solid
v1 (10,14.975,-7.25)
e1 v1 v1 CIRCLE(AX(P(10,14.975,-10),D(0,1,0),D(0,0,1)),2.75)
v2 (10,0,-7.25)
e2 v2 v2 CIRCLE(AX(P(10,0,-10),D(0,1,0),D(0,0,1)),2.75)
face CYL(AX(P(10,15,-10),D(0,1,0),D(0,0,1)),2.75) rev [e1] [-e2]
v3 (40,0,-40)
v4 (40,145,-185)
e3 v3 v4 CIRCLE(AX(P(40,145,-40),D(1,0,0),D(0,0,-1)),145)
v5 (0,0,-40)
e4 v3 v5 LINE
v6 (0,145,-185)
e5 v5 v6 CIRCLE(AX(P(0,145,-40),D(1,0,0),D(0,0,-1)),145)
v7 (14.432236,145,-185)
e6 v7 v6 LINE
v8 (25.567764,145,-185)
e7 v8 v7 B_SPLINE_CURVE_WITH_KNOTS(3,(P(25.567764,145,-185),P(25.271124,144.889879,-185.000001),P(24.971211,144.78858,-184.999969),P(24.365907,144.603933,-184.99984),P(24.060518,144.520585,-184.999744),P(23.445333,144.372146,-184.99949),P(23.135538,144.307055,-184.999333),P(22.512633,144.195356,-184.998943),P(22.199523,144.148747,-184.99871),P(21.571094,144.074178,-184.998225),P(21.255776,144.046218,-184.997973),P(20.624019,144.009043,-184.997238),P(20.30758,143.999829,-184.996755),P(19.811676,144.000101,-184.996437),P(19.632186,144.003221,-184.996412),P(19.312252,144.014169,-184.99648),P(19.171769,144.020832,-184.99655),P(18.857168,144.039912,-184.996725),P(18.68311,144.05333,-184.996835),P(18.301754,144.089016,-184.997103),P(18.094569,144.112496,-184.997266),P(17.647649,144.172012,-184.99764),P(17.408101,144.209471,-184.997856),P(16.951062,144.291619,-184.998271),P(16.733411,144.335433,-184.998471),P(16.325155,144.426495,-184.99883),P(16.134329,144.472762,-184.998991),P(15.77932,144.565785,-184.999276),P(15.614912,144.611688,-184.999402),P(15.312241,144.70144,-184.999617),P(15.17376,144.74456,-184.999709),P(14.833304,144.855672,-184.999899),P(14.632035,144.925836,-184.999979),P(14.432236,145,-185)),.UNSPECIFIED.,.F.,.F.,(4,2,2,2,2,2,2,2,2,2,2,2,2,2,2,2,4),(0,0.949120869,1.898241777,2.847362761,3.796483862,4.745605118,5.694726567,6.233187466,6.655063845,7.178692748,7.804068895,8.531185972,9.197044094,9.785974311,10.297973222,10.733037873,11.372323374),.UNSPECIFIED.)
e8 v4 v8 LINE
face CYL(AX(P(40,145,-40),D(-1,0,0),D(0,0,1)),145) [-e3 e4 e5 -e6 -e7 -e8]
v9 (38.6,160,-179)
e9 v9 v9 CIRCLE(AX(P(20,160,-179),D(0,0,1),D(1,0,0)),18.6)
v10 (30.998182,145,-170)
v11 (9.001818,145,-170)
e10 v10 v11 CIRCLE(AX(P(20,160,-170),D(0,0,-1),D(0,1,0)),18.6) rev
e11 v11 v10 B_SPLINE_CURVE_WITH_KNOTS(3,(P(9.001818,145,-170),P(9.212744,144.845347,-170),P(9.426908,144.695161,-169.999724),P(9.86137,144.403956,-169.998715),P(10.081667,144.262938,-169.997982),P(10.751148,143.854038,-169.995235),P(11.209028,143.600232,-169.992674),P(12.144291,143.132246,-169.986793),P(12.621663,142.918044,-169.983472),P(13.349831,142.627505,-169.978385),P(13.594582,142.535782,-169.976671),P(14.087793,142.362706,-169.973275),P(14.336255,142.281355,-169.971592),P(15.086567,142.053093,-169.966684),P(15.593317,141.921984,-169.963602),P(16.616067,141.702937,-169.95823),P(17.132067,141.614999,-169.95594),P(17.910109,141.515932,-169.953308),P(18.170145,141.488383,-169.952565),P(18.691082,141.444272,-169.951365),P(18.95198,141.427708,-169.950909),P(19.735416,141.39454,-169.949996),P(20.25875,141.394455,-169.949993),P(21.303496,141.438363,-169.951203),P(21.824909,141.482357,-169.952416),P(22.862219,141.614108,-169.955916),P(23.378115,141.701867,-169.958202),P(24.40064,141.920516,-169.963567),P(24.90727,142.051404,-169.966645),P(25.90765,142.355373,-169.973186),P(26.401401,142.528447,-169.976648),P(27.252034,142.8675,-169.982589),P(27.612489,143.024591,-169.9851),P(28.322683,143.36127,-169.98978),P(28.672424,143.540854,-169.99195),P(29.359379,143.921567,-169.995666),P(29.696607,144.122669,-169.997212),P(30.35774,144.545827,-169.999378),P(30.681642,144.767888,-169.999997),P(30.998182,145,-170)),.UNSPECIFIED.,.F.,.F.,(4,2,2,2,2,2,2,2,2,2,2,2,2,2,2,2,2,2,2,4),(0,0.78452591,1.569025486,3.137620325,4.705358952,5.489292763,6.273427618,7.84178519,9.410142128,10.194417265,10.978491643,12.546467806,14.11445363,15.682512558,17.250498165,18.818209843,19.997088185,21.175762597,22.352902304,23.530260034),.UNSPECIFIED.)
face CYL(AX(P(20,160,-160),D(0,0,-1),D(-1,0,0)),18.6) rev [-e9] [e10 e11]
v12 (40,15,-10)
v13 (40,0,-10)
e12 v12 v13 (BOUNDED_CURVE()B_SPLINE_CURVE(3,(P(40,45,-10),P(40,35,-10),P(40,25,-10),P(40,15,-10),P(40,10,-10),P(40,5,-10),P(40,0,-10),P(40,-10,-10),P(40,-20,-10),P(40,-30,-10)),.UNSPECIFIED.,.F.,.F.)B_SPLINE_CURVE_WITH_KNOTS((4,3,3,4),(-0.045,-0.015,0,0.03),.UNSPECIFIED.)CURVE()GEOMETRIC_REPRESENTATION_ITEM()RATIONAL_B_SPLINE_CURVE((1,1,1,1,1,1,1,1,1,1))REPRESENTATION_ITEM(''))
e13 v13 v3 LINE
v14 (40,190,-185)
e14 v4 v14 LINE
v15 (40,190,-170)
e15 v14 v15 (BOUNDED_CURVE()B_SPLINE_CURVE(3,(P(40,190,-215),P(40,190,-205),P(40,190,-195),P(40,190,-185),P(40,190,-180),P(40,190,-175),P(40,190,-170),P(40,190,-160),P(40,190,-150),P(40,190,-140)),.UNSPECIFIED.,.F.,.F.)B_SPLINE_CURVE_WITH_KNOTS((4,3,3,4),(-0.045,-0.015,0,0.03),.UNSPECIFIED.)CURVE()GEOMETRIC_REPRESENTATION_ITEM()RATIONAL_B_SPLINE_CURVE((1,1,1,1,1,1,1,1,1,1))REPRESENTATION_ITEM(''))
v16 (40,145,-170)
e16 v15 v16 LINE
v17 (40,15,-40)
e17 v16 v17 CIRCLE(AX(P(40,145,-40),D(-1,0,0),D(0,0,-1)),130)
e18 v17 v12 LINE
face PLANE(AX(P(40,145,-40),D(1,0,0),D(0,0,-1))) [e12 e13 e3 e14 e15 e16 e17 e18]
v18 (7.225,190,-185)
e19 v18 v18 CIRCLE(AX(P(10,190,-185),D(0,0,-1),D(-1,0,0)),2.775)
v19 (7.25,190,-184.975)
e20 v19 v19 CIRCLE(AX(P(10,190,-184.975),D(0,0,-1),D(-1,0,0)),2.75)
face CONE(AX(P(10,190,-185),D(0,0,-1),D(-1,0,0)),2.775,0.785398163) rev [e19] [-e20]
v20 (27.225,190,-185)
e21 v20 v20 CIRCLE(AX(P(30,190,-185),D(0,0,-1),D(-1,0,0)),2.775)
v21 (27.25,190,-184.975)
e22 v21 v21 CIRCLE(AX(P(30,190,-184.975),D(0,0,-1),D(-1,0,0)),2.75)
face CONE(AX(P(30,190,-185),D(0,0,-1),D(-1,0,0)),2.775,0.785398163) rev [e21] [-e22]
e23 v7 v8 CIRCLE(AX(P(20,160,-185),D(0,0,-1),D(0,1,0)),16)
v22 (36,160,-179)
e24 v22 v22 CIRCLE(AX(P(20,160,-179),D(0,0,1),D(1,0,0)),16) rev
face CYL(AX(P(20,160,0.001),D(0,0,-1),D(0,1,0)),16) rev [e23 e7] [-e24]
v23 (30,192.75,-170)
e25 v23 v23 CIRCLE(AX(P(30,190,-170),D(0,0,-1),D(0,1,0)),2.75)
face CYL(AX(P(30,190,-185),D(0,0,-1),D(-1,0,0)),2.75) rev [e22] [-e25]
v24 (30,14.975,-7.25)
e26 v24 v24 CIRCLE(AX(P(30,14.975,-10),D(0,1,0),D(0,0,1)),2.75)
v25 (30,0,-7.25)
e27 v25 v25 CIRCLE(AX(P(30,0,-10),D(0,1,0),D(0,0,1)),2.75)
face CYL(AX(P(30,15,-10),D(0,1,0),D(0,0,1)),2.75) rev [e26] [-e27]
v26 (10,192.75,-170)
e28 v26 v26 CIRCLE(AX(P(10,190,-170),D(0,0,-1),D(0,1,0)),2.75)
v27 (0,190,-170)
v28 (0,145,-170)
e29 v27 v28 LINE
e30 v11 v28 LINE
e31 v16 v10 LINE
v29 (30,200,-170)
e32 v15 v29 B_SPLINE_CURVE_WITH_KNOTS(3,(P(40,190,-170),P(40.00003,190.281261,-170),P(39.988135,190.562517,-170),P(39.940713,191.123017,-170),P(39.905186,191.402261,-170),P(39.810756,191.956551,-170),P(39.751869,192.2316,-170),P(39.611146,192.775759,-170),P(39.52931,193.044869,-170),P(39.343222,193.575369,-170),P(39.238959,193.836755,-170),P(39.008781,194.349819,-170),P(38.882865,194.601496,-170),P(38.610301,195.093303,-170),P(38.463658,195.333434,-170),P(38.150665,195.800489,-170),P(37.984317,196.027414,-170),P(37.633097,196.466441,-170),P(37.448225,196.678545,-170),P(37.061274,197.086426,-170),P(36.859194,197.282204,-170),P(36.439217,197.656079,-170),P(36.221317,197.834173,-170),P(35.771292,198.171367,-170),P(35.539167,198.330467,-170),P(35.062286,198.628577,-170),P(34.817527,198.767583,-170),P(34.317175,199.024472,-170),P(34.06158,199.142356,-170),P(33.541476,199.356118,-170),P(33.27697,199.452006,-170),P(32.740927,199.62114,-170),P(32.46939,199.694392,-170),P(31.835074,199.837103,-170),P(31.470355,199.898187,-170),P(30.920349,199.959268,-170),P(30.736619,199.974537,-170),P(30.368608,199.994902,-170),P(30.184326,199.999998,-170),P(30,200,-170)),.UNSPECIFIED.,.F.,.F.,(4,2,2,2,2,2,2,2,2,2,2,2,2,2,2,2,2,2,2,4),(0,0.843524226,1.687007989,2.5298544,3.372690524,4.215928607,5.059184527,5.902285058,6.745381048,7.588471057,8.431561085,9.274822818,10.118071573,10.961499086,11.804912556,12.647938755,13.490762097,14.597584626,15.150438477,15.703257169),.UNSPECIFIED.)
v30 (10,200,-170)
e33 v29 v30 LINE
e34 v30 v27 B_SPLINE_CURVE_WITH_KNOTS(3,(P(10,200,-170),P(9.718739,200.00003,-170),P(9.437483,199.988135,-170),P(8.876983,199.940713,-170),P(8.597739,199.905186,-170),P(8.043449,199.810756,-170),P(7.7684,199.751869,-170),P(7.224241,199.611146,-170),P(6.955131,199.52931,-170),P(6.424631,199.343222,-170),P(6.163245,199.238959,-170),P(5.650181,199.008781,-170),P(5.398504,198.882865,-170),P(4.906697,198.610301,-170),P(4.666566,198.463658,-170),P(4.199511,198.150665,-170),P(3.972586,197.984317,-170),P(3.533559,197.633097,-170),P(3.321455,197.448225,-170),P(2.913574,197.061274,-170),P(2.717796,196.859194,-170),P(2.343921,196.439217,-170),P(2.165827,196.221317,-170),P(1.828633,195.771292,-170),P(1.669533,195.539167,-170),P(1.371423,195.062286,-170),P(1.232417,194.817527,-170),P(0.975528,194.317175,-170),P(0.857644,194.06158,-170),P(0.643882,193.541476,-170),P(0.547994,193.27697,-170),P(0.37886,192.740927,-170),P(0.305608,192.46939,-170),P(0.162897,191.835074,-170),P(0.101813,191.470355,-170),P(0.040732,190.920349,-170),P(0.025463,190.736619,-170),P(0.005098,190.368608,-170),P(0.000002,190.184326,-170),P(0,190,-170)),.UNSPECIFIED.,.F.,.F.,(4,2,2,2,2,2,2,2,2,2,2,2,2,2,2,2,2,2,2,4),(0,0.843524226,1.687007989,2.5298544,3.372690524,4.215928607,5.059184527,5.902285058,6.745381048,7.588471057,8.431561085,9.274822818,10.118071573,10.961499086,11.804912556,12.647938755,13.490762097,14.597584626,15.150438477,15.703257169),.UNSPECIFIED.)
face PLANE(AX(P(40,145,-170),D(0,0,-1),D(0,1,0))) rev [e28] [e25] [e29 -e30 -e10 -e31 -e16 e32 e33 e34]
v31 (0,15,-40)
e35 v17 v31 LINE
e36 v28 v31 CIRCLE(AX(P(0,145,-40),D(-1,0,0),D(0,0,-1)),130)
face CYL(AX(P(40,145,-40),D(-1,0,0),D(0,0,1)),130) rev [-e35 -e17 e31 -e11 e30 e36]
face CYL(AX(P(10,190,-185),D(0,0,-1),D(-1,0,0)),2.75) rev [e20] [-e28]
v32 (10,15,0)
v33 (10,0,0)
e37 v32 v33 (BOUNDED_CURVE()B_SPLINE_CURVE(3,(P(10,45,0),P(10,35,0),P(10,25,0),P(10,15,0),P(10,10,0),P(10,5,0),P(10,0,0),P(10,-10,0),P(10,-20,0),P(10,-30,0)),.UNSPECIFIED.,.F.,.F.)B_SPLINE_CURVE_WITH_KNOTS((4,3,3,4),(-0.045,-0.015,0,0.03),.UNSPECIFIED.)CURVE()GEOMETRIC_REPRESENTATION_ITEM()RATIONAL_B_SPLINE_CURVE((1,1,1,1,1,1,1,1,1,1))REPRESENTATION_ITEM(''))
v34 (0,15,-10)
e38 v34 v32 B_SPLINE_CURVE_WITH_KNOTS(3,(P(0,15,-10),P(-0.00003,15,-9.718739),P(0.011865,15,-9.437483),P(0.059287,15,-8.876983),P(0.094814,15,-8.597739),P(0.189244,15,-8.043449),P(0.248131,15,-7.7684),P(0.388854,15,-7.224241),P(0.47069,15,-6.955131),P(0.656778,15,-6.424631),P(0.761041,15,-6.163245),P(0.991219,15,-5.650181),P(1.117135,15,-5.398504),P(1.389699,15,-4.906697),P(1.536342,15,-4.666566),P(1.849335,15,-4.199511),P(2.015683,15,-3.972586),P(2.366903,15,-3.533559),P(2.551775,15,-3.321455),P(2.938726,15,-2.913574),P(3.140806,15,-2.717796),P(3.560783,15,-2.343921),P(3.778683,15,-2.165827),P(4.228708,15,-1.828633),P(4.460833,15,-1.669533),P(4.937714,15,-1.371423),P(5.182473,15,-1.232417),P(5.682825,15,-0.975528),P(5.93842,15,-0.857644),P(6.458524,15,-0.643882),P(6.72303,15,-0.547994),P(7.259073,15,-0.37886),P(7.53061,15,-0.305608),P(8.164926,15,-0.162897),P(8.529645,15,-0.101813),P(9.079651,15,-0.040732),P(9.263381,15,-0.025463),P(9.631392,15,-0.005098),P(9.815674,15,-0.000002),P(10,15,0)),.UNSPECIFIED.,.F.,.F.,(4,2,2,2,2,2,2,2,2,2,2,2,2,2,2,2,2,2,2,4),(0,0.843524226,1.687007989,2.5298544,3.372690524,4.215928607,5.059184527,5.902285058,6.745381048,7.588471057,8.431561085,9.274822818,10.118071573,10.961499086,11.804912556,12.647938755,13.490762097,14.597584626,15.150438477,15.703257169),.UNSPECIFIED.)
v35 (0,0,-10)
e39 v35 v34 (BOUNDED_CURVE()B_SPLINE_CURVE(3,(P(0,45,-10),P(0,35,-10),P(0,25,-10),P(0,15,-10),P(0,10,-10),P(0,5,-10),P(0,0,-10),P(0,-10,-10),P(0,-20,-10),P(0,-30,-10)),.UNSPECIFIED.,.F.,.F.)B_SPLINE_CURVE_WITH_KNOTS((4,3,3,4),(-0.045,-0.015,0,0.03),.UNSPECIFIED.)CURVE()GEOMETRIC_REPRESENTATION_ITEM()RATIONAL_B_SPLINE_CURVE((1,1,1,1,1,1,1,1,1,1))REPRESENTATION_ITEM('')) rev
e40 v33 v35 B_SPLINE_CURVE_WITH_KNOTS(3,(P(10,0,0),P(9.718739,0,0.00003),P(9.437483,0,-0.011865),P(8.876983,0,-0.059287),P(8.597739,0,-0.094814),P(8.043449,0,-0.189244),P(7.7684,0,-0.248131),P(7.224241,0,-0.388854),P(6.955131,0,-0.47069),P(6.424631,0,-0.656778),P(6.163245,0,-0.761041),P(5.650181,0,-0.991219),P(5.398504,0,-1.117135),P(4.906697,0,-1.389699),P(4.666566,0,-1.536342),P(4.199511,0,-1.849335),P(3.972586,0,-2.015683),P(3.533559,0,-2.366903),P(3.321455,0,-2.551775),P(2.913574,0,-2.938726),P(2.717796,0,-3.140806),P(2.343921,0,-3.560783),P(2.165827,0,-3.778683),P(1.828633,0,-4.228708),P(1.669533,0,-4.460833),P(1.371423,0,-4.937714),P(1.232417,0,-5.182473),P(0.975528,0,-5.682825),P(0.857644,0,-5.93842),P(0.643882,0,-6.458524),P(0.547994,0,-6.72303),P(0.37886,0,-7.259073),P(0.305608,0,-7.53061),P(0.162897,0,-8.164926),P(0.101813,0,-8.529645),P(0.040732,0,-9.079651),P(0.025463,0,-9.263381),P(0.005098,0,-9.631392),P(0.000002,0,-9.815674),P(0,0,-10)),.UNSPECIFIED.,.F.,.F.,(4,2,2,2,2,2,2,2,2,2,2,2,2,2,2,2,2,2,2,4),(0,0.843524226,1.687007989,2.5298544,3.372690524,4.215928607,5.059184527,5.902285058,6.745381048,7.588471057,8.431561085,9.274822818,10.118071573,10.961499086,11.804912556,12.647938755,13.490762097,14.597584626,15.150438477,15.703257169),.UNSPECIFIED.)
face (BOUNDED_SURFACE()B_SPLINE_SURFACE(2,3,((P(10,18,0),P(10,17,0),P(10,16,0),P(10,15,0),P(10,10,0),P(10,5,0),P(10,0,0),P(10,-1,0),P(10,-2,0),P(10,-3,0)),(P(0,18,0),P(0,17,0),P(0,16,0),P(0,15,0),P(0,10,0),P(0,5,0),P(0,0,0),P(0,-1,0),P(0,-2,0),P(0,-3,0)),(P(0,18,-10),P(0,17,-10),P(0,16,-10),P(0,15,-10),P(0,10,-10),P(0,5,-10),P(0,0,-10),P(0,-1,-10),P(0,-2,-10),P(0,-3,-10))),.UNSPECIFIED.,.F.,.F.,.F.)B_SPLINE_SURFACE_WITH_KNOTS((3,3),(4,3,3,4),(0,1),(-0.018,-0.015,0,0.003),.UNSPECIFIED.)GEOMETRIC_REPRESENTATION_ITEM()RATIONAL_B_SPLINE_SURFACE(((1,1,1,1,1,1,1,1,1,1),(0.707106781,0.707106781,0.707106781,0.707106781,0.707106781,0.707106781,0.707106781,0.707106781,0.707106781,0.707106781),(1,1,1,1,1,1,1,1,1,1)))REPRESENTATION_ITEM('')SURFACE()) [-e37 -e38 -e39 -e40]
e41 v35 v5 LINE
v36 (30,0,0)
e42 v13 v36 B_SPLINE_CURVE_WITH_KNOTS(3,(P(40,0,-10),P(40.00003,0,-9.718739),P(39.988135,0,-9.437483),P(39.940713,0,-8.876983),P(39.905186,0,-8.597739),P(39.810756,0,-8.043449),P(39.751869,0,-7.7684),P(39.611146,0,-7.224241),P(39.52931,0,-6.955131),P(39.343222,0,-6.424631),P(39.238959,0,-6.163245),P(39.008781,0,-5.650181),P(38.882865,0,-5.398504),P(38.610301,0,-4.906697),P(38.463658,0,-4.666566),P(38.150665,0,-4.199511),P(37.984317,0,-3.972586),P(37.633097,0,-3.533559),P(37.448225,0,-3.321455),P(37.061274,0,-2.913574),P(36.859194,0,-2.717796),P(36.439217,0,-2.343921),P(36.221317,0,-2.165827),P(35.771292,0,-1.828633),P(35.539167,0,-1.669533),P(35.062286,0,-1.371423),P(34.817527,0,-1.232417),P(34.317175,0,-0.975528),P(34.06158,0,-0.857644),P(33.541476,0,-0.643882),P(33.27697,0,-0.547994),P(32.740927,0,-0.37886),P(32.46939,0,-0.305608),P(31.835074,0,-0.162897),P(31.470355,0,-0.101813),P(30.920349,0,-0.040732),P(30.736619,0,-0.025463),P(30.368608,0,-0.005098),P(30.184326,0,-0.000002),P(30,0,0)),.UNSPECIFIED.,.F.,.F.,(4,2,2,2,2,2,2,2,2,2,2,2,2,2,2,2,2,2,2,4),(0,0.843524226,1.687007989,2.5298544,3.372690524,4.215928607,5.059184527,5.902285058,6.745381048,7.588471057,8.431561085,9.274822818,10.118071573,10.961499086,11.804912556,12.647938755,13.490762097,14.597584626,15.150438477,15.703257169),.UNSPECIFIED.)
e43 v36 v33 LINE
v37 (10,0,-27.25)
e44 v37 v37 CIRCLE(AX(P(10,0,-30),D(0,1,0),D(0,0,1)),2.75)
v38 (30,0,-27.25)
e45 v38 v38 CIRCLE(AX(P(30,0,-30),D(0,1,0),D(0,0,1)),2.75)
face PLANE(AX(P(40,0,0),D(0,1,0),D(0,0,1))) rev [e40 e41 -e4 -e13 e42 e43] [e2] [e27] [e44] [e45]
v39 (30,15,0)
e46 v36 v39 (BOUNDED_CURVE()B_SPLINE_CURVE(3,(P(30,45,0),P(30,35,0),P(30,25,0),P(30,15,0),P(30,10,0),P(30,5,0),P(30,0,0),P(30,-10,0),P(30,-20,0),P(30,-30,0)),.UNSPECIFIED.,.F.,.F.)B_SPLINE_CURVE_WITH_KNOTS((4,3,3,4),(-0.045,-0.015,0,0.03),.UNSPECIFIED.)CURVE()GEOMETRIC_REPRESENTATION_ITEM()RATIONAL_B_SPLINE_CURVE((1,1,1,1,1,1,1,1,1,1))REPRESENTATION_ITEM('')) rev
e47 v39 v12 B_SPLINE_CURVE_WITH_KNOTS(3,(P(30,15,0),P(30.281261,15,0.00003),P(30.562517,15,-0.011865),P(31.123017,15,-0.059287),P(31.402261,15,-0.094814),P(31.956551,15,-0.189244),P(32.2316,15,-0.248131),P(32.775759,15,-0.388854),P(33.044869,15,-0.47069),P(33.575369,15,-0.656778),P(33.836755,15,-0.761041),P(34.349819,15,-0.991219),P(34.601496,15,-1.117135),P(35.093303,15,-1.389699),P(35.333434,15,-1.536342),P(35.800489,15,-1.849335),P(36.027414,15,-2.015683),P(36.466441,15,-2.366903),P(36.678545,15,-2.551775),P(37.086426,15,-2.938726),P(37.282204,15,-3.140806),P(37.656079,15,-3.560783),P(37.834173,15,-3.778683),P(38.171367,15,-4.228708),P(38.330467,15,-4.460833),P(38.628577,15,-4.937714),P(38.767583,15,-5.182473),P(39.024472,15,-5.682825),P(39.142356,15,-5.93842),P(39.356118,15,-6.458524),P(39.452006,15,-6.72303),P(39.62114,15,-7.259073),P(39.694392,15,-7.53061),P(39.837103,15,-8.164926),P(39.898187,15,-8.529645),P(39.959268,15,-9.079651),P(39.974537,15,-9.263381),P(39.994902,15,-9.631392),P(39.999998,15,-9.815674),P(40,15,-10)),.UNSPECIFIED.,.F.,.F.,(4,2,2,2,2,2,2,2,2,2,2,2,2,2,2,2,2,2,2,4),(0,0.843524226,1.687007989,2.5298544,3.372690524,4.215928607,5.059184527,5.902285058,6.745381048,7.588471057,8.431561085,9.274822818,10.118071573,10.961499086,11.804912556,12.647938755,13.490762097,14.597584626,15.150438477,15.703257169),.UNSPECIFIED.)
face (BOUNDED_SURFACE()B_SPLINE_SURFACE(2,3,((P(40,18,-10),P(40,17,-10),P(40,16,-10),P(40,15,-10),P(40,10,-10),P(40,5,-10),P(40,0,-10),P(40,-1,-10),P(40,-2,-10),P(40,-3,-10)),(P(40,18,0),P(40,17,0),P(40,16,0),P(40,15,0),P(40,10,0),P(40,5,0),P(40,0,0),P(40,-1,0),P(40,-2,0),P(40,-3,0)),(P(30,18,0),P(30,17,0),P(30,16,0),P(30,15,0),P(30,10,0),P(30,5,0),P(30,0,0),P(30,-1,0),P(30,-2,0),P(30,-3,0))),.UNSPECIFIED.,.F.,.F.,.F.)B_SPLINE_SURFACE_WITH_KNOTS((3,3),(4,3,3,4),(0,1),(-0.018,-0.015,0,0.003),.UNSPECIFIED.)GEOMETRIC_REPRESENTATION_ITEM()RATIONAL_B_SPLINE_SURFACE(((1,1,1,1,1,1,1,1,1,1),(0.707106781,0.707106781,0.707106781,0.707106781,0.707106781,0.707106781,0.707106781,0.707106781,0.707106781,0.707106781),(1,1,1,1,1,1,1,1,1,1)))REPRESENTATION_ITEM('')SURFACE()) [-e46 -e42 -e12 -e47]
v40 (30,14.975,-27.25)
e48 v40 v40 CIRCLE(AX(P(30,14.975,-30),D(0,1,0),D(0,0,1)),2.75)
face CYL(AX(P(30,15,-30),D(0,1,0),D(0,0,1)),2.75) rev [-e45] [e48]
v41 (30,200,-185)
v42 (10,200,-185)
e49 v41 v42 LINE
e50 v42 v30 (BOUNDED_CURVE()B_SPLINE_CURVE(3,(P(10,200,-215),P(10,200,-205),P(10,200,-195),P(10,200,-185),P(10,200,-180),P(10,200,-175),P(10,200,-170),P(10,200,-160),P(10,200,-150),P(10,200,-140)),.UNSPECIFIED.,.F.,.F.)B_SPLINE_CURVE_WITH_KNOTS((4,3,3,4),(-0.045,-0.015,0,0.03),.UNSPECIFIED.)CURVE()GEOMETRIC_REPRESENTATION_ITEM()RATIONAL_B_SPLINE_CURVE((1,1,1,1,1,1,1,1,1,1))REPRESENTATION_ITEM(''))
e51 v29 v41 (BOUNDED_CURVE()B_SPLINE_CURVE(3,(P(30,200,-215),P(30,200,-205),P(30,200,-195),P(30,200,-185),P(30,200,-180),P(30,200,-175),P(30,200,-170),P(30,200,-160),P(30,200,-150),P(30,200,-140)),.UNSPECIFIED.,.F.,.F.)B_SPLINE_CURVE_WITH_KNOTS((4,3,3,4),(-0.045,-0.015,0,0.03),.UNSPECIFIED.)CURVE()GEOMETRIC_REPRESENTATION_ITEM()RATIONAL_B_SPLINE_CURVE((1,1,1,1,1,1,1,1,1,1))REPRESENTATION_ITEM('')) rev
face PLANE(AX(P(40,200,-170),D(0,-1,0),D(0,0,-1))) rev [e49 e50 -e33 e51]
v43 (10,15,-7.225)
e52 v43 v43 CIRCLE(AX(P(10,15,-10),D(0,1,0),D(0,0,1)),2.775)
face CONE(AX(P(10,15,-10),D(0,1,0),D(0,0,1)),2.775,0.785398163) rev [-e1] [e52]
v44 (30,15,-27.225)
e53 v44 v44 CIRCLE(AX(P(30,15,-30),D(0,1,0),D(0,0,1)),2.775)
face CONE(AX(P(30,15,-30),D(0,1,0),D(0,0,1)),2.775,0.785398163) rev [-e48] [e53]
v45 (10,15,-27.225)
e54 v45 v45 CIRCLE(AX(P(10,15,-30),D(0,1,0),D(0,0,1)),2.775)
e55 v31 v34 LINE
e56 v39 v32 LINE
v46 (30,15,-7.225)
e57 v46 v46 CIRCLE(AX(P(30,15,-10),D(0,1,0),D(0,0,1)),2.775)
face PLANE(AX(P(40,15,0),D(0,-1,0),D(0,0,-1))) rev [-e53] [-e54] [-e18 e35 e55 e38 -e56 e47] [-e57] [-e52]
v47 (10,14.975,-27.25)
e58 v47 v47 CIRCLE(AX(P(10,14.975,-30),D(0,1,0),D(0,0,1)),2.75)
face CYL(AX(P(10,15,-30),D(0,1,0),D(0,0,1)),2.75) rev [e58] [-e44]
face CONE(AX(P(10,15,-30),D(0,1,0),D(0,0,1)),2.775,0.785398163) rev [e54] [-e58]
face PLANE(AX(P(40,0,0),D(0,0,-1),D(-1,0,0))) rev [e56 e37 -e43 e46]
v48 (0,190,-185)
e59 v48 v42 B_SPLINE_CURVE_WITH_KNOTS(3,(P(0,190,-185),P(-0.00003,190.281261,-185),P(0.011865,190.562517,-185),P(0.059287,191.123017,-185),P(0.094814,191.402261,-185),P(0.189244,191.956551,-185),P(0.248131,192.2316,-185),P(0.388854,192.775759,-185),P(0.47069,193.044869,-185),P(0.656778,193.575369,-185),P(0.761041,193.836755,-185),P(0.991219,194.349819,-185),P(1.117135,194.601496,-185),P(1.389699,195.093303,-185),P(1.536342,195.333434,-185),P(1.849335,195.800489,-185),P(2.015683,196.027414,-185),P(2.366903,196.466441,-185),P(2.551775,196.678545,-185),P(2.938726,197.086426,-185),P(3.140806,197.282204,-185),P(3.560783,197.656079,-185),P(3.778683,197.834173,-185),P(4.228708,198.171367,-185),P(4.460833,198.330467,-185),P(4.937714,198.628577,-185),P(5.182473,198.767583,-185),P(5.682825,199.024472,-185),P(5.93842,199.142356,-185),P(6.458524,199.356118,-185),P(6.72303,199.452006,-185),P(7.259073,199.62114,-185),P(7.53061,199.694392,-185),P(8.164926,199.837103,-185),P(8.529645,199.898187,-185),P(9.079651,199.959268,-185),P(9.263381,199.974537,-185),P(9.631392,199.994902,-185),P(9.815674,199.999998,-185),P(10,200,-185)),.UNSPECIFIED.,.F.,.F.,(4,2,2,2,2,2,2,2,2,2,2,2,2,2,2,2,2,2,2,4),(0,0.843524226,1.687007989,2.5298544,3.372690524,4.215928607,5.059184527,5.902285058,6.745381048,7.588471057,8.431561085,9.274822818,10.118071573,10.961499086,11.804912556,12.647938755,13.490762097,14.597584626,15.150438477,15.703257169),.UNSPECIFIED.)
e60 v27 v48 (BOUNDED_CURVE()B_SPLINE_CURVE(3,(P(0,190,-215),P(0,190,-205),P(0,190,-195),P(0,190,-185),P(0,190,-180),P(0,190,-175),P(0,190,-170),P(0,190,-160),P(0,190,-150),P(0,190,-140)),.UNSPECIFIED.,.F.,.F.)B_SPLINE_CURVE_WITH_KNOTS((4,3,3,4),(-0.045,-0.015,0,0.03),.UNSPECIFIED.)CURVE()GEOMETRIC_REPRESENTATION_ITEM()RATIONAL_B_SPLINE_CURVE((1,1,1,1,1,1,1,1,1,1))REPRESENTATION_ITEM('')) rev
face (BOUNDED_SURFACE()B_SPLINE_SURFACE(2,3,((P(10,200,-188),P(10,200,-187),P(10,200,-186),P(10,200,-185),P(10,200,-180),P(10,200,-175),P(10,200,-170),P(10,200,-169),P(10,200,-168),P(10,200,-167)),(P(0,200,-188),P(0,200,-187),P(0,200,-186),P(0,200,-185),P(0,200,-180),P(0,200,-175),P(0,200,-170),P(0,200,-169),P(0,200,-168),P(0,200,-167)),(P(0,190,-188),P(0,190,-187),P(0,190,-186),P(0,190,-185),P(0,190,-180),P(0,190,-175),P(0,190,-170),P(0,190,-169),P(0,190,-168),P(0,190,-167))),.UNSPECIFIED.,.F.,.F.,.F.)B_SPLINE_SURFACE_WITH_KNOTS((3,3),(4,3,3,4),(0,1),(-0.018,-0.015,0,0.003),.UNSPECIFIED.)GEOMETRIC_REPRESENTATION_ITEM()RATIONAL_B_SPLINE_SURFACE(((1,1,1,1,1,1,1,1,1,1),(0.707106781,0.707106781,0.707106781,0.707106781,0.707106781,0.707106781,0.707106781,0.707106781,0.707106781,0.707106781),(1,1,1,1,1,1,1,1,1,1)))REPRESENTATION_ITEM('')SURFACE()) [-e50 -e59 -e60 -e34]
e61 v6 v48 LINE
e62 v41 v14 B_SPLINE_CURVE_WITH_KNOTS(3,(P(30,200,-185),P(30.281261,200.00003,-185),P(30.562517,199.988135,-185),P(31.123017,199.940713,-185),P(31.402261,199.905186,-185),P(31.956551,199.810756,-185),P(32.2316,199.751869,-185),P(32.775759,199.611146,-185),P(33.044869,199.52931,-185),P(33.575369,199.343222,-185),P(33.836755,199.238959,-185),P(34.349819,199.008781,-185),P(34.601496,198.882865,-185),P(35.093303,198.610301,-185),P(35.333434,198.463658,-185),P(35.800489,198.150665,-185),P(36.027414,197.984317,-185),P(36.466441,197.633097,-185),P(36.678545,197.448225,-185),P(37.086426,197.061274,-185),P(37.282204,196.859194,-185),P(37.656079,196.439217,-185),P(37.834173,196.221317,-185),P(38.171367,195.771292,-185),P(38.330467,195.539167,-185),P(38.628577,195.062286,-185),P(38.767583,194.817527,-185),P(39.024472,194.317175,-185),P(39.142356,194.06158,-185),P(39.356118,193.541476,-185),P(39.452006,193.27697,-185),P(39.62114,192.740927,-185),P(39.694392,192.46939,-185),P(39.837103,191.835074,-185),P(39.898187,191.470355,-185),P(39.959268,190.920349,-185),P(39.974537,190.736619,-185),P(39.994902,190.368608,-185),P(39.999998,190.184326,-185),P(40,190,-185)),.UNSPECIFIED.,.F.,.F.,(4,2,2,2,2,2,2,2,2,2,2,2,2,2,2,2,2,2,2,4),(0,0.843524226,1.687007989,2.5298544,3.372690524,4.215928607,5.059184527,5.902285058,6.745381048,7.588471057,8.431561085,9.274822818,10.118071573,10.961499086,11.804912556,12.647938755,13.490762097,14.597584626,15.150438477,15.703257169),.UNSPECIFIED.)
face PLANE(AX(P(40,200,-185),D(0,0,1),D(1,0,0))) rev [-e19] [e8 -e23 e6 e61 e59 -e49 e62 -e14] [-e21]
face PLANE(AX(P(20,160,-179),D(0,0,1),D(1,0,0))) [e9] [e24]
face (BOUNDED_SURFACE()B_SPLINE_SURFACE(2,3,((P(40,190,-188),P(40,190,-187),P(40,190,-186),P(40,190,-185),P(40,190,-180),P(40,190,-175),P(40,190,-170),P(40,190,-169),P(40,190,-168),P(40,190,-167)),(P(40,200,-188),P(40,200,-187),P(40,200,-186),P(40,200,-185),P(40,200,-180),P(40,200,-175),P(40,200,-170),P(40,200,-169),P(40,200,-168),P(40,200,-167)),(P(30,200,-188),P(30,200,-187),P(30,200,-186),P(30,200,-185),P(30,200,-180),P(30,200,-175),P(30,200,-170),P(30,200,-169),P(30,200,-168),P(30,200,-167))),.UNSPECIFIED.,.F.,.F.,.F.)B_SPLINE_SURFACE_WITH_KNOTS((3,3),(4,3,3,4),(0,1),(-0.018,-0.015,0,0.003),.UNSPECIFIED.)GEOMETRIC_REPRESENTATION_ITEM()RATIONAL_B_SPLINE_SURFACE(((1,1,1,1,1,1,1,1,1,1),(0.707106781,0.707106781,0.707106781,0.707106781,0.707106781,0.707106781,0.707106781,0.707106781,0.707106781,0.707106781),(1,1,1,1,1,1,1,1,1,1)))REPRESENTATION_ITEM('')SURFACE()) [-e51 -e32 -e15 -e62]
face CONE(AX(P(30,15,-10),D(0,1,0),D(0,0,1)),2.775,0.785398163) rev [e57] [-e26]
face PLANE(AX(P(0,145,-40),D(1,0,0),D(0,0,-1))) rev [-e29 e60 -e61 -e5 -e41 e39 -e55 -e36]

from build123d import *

# Parameters (mm, degrees)
BOSS_EXTRUDE2_DEPTH            = 40
M5_CLEARANCE_HOLE2_D           = 5.5
M5_CLEARANCE_HOLE2_CSINK_D     = 5.55
M5_CLEARANCE_HOLE2_CSINK_ANGLE = 90
CUT_EXTRUDE1_REACH             = 277.363
SKETCH10_R                     = 16
CUT_EXTRUDE2_DEPTH             = 10
CUT_EXTRUDE2_DEPTH_BACK        = 9
SKETCH12_R                     = 18.6
FILLET1_R                      = 10
M5_CLEARANCE_HOLE3_D           = 5.5
M5_CLEARANCE_HOLE3_CSINK_D     = 5.55
M5_CLEARANCE_HOLE3_CSINK_ANGLE = 90


with BuildPart() as part:
    # Sketch6 → Boss-Extrude2 (new body)
    with BuildSketch(Plane(origin=(0, 0, 0), x_dir=(0, 0, -1), z_dir=(1, 0, 0))):
        with BuildLine():
            Line((0, 0), (40, 0))
            ThreePointArc((40, 0), (142.530483272, 42.469516728), (185, 145))
            Line((185, 145), (185, 200))
            Line((185, 200), (170, 200))
            Line((170, 200), (170, 145))
            ThreePointArc((170, 145), (131.923881554, 53.076118446), (40, 15))
            Line((40, 15), (0, 15))
            Line((0, 15), (0, 0))
        make_face()
    extrude(amount=BOSS_EXTRUDE2_DEPTH)

    # M5 Clearance Hole2 (through all)
    with Locations(Plane(origin=(0, 15, 0), x_dir=(1, 0, 0), z_dir=(0, 1, 0))):
        with Locations((10, 30), (30, 30), (10, 10), (30, 10)):
            CounterSinkHole(M5_CLEARANCE_HOLE2_D / 2, M5_CLEARANCE_HOLE2_CSINK_D / 2, counter_sink_angle=M5_CLEARANCE_HOLE2_CSINK_ANGLE)

    # Sketch10 → Cut-Extrude1 (cut, up to next)
    with BuildSketch(Plane(origin=(0, 0, -185), x_dir=(-1, 0, 0), z_dir=(0, 0, -1)), mode=Mode.PRIVATE) as cut_extrude1_sk1:
        with Locations((-20, 160)):
            Circle(SKETCH10_R)
    cut_extrude1_tool1 = extrude(cut_extrude1_sk1.sketch, amount=-CUT_EXTRUDE1_REACH, mode=Mode.PRIVATE) & part.part
    add(cut_extrude1_tool1.solids().sort_by_distance((20, 160, -185))[0], mode=Mode.SUBTRACT)

    # Sketch12 → Cut-Extrude2 (cut, two sides: drawn at the far end of the back side and taken through both)
    with BuildSketch(Plane.XY.offset(-170).offset(-CUT_EXTRUDE2_DEPTH_BACK)):
        with Locations((20, 160)):
            Circle(SKETCH12_R)
    extrude(amount=CUT_EXTRUDE2_DEPTH + CUT_EXTRUDE2_DEPTH_BACK, mode=Mode.SUBTRACT)

    # Fillet1
    fillet1_edges = [part.edges().sort_by_distance(p)[0] for p in [
        (40, 7.5, 0),
        (0, 7.5, 0),
        (40, 200, -177.5),
        (0, 200, -177.5),
    ]]
    fillet(fillet1_edges, radius=FILLET1_R)

    # M5 Clearance Hole3 (through all)
    with Locations(Plane(origin=(0, 0, -185), x_dir=(-1, 0, 0), z_dir=(0, 0, -1))):
        with Locations((-30, 190), (-10, 190)):
            CounterSinkHole(M5_CLEARANCE_HOLE3_D / 2, M5_CLEARANCE_HOLE3_CSINK_D / 2, counter_sink_angle=M5_CLEARANCE_HOLE3_CSINK_ANGLE)


solid = part.part
